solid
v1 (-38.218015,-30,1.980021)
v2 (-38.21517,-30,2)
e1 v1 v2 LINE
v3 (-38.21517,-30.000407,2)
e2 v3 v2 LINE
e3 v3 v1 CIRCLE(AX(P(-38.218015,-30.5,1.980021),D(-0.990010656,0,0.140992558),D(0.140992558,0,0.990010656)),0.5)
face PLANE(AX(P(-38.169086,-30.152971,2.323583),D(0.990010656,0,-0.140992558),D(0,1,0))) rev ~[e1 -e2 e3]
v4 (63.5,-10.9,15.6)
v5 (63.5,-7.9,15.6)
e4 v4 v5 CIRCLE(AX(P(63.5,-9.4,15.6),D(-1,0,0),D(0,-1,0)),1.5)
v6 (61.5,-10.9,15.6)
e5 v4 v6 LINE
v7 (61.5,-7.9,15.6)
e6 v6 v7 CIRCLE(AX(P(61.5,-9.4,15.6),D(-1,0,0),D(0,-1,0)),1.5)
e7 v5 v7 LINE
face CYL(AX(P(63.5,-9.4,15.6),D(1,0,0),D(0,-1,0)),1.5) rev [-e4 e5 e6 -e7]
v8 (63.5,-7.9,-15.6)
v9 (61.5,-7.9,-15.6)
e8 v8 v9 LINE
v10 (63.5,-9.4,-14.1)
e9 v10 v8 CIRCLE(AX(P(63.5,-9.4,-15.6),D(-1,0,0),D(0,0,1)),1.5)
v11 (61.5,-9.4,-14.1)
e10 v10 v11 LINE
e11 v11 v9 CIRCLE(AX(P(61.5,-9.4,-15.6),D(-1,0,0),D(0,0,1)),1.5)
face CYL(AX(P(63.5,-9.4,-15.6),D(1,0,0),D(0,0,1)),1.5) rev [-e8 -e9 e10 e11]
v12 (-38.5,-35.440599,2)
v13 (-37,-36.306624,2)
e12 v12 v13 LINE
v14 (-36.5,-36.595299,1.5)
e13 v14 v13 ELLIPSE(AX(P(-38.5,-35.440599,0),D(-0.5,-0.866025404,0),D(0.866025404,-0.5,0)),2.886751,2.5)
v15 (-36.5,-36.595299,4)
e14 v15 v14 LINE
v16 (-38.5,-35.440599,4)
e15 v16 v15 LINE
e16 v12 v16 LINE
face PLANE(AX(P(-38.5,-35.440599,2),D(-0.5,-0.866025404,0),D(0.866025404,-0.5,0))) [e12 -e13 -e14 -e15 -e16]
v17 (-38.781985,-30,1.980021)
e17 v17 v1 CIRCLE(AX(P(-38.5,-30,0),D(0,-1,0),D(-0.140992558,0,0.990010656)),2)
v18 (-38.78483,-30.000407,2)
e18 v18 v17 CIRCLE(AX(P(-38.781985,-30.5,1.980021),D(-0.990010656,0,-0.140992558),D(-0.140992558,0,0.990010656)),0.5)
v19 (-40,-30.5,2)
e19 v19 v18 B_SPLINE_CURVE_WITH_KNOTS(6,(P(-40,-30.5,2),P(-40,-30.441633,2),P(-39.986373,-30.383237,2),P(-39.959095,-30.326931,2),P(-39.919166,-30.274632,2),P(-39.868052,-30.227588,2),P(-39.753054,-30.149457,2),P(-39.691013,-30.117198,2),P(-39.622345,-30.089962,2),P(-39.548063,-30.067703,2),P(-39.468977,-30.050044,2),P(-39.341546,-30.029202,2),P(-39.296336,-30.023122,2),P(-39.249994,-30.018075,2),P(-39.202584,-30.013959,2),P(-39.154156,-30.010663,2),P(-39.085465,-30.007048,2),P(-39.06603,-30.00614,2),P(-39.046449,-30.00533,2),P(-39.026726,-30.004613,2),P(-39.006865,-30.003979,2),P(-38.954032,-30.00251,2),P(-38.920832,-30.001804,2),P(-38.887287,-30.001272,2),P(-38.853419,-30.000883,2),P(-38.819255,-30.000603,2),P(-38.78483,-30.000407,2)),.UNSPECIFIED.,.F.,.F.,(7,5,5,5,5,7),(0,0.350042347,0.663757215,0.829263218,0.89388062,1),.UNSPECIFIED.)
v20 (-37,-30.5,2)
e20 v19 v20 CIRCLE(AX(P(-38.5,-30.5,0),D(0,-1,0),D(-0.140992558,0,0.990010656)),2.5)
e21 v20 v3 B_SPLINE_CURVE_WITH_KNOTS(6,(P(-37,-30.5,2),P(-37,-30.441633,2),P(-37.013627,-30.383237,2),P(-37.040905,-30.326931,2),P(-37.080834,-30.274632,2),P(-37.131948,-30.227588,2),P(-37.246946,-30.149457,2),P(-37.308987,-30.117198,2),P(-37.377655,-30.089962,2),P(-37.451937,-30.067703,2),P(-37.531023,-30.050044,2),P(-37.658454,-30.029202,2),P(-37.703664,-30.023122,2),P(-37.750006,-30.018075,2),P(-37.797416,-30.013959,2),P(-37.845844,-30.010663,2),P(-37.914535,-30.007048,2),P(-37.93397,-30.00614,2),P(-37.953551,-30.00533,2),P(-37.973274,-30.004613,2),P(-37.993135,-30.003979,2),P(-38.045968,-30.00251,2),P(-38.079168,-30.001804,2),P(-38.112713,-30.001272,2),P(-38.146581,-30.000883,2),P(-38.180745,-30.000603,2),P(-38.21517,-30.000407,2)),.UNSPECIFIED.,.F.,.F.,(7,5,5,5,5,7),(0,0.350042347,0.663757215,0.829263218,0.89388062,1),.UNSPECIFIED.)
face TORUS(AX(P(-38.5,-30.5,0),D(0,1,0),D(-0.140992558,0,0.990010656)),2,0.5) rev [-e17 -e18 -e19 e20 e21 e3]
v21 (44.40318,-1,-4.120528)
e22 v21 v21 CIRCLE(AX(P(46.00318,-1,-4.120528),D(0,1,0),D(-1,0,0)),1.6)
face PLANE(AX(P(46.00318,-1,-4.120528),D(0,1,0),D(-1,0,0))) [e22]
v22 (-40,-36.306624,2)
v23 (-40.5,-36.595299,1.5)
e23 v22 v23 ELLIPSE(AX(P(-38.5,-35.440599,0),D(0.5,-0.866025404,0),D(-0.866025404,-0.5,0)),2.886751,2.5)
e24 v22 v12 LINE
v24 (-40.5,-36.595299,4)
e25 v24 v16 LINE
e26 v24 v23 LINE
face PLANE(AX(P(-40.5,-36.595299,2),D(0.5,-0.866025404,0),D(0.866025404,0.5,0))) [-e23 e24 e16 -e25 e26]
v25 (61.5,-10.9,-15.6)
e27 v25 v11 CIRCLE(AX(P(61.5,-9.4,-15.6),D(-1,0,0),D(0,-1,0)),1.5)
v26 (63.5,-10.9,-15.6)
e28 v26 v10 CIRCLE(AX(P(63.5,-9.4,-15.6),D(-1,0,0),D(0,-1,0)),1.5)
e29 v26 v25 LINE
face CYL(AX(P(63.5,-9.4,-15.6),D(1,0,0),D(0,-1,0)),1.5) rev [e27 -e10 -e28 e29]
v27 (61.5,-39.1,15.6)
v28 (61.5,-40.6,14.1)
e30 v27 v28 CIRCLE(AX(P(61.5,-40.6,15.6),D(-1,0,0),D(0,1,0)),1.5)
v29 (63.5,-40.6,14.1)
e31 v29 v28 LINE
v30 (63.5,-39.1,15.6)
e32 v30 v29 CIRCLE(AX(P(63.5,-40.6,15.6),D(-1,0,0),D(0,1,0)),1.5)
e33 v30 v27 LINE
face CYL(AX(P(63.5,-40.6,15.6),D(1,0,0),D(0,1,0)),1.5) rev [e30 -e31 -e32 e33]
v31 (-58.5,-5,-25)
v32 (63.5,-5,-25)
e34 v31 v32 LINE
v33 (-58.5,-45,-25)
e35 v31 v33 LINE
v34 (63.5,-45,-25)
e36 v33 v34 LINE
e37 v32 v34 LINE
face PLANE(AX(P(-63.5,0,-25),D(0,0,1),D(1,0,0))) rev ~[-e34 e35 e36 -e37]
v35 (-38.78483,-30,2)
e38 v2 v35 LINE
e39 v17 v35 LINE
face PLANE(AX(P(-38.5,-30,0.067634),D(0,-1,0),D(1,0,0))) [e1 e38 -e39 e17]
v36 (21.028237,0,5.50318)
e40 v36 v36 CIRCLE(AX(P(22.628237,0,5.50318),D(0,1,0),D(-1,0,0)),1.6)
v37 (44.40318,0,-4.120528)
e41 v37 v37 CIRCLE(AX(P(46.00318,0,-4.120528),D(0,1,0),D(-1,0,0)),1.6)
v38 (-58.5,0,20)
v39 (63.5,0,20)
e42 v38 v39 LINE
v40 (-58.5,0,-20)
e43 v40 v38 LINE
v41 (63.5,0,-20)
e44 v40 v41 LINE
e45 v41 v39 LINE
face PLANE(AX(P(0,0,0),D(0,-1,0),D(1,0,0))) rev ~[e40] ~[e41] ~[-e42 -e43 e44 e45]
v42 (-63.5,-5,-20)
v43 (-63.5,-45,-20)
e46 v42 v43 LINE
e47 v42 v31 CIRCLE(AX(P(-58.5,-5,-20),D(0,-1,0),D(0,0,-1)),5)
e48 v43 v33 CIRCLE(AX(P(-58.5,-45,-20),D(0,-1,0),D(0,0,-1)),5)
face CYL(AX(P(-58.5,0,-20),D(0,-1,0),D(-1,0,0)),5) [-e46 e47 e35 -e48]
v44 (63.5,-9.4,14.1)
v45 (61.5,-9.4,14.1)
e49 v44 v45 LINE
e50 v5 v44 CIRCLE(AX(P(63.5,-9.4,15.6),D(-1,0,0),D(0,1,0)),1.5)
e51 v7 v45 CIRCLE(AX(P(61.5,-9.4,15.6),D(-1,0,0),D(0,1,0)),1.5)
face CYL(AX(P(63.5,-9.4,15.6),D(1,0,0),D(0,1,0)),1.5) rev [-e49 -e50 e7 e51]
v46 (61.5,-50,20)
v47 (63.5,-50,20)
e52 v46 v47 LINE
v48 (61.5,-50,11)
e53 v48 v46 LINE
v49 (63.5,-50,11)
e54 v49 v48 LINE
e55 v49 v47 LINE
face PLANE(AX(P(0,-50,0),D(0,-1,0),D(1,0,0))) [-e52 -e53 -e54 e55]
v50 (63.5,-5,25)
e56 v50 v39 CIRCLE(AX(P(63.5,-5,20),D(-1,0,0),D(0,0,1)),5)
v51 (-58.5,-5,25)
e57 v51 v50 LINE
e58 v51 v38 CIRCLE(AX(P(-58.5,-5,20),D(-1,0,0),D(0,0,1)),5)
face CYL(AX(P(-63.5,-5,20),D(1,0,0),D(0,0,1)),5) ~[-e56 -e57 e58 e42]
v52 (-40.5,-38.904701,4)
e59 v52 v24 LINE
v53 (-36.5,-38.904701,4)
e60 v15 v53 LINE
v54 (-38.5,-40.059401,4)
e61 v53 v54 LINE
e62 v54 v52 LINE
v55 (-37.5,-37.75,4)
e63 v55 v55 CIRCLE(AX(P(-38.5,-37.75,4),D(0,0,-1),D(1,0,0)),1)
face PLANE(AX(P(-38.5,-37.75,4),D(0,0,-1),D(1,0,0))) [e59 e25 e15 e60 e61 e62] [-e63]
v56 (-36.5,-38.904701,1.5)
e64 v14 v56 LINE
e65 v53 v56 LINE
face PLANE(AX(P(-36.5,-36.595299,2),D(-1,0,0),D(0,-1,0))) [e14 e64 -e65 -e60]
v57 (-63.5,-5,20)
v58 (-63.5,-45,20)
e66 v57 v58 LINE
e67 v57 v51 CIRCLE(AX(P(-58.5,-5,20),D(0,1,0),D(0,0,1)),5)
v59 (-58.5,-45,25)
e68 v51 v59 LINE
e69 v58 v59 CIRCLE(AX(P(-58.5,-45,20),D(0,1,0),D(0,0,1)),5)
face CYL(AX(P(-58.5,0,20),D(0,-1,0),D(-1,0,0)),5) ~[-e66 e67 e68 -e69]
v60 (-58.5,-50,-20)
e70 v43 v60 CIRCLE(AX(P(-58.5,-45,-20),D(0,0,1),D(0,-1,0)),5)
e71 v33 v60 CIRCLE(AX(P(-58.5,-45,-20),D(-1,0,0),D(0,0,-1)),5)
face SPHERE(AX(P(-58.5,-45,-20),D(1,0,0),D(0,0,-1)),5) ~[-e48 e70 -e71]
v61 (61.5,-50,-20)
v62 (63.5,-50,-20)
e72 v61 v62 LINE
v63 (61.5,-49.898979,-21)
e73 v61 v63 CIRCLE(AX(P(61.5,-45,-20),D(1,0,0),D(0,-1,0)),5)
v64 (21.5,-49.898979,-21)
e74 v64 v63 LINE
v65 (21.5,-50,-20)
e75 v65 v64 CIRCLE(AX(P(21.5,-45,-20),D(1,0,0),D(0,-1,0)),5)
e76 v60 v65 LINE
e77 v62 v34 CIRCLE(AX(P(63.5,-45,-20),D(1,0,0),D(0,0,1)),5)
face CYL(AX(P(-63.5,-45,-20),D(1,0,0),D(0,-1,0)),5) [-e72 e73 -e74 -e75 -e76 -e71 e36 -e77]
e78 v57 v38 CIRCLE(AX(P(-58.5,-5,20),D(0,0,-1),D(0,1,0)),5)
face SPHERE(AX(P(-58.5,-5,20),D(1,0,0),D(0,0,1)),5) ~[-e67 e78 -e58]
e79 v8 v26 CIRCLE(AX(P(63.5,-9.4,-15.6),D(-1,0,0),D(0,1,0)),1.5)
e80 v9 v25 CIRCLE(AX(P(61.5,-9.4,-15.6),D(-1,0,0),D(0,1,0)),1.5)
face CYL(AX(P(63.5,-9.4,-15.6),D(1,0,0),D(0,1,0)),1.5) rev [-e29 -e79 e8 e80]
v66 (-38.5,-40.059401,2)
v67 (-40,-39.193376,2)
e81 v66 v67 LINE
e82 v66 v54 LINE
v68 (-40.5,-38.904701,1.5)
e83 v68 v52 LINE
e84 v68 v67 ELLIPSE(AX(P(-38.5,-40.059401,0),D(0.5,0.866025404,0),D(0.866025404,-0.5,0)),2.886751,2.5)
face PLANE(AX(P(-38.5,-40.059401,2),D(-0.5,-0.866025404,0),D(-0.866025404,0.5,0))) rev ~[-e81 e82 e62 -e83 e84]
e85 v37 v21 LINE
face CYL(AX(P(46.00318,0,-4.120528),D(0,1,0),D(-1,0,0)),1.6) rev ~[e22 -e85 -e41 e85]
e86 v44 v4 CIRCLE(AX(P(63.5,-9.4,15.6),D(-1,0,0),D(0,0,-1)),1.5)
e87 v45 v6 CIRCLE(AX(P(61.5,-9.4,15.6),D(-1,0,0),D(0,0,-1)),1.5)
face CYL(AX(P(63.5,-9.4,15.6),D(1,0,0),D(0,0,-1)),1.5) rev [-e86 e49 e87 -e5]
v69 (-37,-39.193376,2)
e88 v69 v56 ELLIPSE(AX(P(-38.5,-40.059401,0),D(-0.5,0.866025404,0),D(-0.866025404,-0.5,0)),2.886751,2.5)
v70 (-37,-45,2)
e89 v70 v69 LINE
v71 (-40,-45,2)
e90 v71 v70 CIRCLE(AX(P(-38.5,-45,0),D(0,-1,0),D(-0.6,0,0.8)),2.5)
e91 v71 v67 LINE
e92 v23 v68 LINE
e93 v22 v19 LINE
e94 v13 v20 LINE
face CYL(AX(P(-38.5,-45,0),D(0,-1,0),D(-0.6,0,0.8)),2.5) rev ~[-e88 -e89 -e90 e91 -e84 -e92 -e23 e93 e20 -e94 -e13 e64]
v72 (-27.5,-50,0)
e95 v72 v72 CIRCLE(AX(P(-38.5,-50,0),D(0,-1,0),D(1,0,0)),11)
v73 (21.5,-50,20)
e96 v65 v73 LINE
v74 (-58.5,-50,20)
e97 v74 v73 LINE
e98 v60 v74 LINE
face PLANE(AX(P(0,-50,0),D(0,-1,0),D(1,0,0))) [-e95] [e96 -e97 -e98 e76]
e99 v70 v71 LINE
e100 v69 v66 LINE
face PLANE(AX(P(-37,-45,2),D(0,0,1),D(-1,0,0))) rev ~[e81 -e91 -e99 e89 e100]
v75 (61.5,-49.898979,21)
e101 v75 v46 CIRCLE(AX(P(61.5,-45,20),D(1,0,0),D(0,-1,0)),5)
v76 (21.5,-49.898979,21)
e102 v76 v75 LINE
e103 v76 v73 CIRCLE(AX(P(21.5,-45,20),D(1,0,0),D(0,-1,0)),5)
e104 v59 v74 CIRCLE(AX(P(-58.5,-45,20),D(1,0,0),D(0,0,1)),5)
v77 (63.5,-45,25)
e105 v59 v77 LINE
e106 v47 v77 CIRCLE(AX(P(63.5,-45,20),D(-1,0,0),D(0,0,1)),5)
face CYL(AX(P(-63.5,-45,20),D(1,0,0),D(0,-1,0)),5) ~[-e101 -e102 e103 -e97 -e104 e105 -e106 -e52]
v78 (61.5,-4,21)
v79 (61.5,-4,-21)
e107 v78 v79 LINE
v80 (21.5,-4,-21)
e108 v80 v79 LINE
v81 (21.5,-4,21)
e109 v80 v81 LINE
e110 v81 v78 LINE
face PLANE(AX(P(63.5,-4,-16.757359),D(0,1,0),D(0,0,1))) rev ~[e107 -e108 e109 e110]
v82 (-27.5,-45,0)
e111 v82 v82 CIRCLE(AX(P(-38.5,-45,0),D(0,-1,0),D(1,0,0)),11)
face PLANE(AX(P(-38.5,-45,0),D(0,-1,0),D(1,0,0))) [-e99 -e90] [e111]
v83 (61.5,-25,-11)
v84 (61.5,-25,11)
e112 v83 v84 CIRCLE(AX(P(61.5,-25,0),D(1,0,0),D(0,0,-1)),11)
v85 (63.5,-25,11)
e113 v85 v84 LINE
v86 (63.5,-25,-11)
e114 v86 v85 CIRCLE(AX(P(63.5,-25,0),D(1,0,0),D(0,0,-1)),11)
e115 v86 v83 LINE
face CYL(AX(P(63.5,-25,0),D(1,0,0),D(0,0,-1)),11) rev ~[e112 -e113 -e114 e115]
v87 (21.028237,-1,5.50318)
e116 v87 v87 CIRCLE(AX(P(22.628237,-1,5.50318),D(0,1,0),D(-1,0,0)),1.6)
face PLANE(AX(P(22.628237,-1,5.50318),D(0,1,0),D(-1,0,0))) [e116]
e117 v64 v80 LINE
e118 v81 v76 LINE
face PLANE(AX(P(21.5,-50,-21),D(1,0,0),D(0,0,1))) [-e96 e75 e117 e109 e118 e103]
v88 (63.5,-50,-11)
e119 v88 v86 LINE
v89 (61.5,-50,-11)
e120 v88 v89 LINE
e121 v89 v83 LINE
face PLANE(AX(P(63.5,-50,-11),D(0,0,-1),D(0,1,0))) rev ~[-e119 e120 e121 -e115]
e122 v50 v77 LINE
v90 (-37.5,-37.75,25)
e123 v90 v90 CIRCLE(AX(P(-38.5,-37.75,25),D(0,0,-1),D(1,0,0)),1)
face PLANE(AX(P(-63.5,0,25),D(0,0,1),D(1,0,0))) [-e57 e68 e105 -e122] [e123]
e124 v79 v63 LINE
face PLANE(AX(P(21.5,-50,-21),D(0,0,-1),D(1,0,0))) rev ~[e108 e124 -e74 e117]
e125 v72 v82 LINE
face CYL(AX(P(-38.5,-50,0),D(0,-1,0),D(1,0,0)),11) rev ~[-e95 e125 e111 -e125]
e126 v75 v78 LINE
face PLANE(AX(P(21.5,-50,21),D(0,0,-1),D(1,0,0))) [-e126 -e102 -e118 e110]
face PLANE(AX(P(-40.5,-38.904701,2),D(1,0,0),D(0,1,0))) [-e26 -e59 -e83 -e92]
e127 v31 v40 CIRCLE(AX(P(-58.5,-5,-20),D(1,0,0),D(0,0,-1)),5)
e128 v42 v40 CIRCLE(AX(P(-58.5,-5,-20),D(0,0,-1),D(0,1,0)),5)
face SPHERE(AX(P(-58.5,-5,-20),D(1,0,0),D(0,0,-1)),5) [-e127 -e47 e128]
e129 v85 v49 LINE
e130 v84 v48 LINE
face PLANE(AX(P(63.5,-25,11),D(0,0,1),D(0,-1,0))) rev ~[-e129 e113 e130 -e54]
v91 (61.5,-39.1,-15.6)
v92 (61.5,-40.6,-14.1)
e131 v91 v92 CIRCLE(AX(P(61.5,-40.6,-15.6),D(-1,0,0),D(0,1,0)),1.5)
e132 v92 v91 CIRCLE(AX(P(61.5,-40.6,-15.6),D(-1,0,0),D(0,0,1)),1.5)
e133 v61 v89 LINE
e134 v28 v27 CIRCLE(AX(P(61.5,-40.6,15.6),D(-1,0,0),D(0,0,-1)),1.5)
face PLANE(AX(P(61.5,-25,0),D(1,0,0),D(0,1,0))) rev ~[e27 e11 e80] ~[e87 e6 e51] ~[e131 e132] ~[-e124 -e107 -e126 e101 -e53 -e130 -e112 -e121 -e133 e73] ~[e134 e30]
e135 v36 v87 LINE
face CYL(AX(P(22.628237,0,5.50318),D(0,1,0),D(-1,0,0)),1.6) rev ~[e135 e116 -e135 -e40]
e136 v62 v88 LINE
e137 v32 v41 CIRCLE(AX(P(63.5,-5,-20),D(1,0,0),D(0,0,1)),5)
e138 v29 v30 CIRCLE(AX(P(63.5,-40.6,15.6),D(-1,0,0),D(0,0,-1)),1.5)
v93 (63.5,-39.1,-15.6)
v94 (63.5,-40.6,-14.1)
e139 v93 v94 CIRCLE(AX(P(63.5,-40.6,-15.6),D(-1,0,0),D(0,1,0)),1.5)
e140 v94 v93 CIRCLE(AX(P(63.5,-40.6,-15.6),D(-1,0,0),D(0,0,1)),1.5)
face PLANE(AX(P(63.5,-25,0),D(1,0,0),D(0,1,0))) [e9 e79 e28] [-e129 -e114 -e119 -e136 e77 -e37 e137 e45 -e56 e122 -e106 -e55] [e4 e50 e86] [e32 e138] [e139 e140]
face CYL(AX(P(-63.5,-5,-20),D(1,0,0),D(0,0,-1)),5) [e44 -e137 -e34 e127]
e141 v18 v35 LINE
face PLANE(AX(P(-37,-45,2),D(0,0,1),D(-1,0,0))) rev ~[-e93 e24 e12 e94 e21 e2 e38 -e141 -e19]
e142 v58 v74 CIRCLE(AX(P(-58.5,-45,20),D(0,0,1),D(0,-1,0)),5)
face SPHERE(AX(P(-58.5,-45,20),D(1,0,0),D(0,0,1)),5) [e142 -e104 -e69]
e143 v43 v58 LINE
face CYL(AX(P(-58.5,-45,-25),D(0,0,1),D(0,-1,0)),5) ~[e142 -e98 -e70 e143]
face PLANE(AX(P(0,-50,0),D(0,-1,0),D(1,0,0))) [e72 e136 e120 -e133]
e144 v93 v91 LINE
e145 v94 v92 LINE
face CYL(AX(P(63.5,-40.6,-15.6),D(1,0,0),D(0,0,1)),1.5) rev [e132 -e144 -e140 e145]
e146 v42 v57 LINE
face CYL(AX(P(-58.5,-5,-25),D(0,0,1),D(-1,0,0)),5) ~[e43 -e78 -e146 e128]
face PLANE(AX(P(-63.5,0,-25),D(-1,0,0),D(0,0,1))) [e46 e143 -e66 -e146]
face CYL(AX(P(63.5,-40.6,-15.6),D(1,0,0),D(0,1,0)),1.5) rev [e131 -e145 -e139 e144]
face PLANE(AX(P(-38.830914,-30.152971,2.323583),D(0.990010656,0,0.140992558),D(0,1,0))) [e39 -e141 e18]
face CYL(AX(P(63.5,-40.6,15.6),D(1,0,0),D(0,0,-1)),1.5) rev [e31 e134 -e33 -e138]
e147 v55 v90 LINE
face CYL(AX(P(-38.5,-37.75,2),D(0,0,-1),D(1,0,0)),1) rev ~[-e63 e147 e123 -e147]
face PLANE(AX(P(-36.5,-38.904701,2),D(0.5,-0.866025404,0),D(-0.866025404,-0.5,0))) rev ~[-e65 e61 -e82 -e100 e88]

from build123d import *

# Parameters (mm, degrees)
F0_W           = 127
F0_H           = 50
F1_DEPTH       = 50
F3_DEPTH       = 42
F4_R           = 11
F5_DEPTH       = 5
F7_DEPTH       = 15
F8_T2_ANGLE    = 343.7894292622
F9_R           = 5
F12_W          = 40
F12_H          = 42
F13_DEPTH      = 46
F14_R          = 1.6
F15_DEPTH      = 1
F16_R          = 1
F17_DEPTH      = 2
F17_DEPTH_BACK = 1.03
F18_DEPTH      = 25
F19_DEPTH      = 2
F20_DEPTH      = 25


# Not quite as in the source:
# - a fillet or chamfer that OpenCascade refuses, or shapes differently, is made with other operations: its cross-section is extruded or revolved along the edge and cut away or added


with BuildPart() as f1:
    # F0 (on Front) → F1 (new body)
    with BuildSketch(Plane.XZ):
        Rectangle(F0_W, F0_H)
    extrude(amount=F1_DEPTH)

    # F2 (on face) → F3 (cut)
    with BuildSketch(Plane.YZ.offset(63.5)):
        Polygon((-41.7573593129, 21), (-46, 16.7573593129), (-46, -16.7573593129), (-41.7573593129, -21), (-8.2426406871, -21), (-4, -16.7573593129), (-4, 16.7573593129), (-8.2426406871, 21), align=None)
    extrude(amount=-F3_DEPTH, mode=Mode.SUBTRACT)

    # F4 (on face) → F5 (cut)
    with BuildSketch(Plane.XZ.offset(50)):
        with Locations((-38.5, 0)):
            Circle(F4_R)
    extrude(amount=-F5_DEPTH, mode=Mode.SUBTRACT)

    # F6 (on face) → F7 (cut)
    with BuildSketch(Plane.XZ.offset(45)):
        with BuildLine():
            Line((-37, 2), (-40, 2))
            ThreePointArc((-40, 2), (-38.5, -2.5), (-37, 2))
        make_face()
    extrude(amount=-F7_DEPTH, mode=Mode.SUBTRACT)

    # F8: fillet of radius 0.5 on 1 edges, made by hand

    # F8_s1 → F8_t2 (revolve)
    with BuildSketch(Plane(origin=(-37.7346622942, 0, -5.3739891953), x_dir=(0, 1, 0), z_dir=(0.9900106558, 0, 0.1409925581))):
        with BuildLine():
            ThreePointArc((-30.5, 7.9282134883), (-30.1464466094, 7.7817668789), (-30, 7.4282134883))
            Line((-30, 7.4282134883), (-30, 7.9282134883))
            Line((-30, 7.9282134883), (-30.5, 7.9282134883))
        make_face()
    revolve(axis=Axis((-38.5, -30, 0), (0, -1, 0)), revolution_arc=F8_T2_ANGLE)

    # F9
    f9_edges = [f1.edges().sort_by_distance(p)[0] for p in [
        (0, -50, 25),
        (0, -50, -25),
        (0, 0, 25),
        (0, 0, -25),
        (-63.5, -25, 25),
        (-63.5, -25, -25),
        (-63.5, 0, 0),
        (-63.5, -50, 0),
    ]]
    fillet(f9_edges, radius=F9_R)

    # F12 (on face) → F13 (cut)
    with BuildSketch(Plane.XZ.offset(50)):
        with Locations((41.5, 0)):
            Rectangle(F12_W, F12_H)
    extrude(amount=-F13_DEPTH, mode=Mode.SUBTRACT)

    # F14 (on face) → F15 (cut)
    with BuildSketch(Plane(origin=(0, 0, 0), x_dir=(-1, 0, 0), z_dir=(0, 1, 0))):
        with Locations((-46.0031795697, -4.1205275279)):
            Circle(F14_R)
        with Locations((-22.6282365388, 5.5031795697)):
            Circle(F14_R)
    extrude(amount=-F15_DEPTH, mode=Mode.SUBTRACT)

    # F16 (on face) → F17 (cut, two sides)
    with BuildSketch(Plane(origin=(0, 0, 2), x_dir=(1, 0, 0), z_dir=(0, 0, -1))) as f17_sk:
        Polygon((-36.5, 38.9047005384), (-38.5, 40.0594010768), (-40.5, 38.9047005384), (-40.5, 36.5952994616), (-38.5, 35.4405989232), (-36.5, 36.5952994616), align=None)
        with Locations((-38.5, 37.75)):
            Circle(F16_R, mode=Mode.SUBTRACT)
    extrude(amount=-F17_DEPTH, mode=Mode.SUBTRACT)
    extrude(f17_sk.sketch, amount=F17_DEPTH_BACK, mode=Mode.SUBTRACT)

    # F18 (cut): a face of the model
    f18_faces = [f1.faces().sort_by_distance(p)[0] for p in [
        (-38.5, -37.75, 2),
    ]]
    extrude(f18_faces, amount=-F18_DEPTH, mode=Mode.SUBTRACT)

    # F10 (on face) → F19 (join)
    with BuildSketch(Plane.YZ.offset(63.5)):
        Polygon((-46, 16.7573593129), (-46, -16.7573593129), (-41.7573593129, -21), (-8.2426406871, -21), (-4, -16.7573593129), (-4, 16.7573593129), (-8.2426406871, 21), (-16.9, 21), (-33.1, 21), (-41.7573593129, 21), align=None)
        with BuildLine():
            Line((-10.9, -15.6), (-39.1, -15.6))
            ThreePointArc((-39.1, -15.6), (-41.6606601718, -16.6606601718), (-40.6, -14.1))
            Line((-40.6, -14.1), (-40.6, 14.1))
            ThreePointArc((-40.6, 14.1), (-41.6606601718, 16.6606601718), (-39.1, 15.6))
            Line((-39.1, 15.6), (-10.9, 15.6))
            ThreePointArc((-10.9, 15.6), (-9.4, 17.1), (-7.9, 15.6))
            ThreePointArc((-7.9, 15.6), (-8.3393398282, 14.5393398282), (-9.4, 14.1))
            Line((-9.4, 14.1), (-9.4, -14.1))
            ThreePointArc((-9.4, -14.1), (-8.3393398282, -14.5393398282), (-7.9, -15.6))
            ThreePointArc((-7.9, -15.6), (-9.4, -17.1), (-10.9, -15.6))
        make_face(mode=Mode.SUBTRACT)
        with BuildLine():
            ThreePointArc((-40.6, -14.1), (-39.5393398282, -14.5393398282), (-39.1, -15.6))
            Line((-39.1, -15.6), (-10.9, -15.6))
            ThreePointArc((-10.9, -15.6), (-10.4606601718, -14.5393398282), (-9.4, -14.1))
            Line((-9.4, -14.1), (-9.4, 14.1))
            ThreePointArc((-9.4, 14.1), (-10.4606601718, 14.5393398282), (-10.9, 15.6))
            Line((-10.9, 15.6), (-39.1, 15.6))
            ThreePointArc((-39.1, 15.6), (-39.5393398282, 14.5393398282), (-40.6, 14.1))
            Line((-40.6, 14.1), (-40.6, -14.1))
        make_face()
    extrude(amount=-F19_DEPTH)

    # F11 (on face) → F20 (cut)
    with BuildSketch(Plane.YZ.offset(63.5)):
        with BuildLine():
            Line((-50, -11), (-25, -11))
            ThreePointArc((-25, -11), (-14, 0), (-25, 11))
            Line((-25, 11), (-50, 11))
            Line((-50, 11), (-50, -11))
        make_face()
    extrude(amount=-F20_DEPTH, mode=Mode.SUBTRACT)


solid = f1.part
